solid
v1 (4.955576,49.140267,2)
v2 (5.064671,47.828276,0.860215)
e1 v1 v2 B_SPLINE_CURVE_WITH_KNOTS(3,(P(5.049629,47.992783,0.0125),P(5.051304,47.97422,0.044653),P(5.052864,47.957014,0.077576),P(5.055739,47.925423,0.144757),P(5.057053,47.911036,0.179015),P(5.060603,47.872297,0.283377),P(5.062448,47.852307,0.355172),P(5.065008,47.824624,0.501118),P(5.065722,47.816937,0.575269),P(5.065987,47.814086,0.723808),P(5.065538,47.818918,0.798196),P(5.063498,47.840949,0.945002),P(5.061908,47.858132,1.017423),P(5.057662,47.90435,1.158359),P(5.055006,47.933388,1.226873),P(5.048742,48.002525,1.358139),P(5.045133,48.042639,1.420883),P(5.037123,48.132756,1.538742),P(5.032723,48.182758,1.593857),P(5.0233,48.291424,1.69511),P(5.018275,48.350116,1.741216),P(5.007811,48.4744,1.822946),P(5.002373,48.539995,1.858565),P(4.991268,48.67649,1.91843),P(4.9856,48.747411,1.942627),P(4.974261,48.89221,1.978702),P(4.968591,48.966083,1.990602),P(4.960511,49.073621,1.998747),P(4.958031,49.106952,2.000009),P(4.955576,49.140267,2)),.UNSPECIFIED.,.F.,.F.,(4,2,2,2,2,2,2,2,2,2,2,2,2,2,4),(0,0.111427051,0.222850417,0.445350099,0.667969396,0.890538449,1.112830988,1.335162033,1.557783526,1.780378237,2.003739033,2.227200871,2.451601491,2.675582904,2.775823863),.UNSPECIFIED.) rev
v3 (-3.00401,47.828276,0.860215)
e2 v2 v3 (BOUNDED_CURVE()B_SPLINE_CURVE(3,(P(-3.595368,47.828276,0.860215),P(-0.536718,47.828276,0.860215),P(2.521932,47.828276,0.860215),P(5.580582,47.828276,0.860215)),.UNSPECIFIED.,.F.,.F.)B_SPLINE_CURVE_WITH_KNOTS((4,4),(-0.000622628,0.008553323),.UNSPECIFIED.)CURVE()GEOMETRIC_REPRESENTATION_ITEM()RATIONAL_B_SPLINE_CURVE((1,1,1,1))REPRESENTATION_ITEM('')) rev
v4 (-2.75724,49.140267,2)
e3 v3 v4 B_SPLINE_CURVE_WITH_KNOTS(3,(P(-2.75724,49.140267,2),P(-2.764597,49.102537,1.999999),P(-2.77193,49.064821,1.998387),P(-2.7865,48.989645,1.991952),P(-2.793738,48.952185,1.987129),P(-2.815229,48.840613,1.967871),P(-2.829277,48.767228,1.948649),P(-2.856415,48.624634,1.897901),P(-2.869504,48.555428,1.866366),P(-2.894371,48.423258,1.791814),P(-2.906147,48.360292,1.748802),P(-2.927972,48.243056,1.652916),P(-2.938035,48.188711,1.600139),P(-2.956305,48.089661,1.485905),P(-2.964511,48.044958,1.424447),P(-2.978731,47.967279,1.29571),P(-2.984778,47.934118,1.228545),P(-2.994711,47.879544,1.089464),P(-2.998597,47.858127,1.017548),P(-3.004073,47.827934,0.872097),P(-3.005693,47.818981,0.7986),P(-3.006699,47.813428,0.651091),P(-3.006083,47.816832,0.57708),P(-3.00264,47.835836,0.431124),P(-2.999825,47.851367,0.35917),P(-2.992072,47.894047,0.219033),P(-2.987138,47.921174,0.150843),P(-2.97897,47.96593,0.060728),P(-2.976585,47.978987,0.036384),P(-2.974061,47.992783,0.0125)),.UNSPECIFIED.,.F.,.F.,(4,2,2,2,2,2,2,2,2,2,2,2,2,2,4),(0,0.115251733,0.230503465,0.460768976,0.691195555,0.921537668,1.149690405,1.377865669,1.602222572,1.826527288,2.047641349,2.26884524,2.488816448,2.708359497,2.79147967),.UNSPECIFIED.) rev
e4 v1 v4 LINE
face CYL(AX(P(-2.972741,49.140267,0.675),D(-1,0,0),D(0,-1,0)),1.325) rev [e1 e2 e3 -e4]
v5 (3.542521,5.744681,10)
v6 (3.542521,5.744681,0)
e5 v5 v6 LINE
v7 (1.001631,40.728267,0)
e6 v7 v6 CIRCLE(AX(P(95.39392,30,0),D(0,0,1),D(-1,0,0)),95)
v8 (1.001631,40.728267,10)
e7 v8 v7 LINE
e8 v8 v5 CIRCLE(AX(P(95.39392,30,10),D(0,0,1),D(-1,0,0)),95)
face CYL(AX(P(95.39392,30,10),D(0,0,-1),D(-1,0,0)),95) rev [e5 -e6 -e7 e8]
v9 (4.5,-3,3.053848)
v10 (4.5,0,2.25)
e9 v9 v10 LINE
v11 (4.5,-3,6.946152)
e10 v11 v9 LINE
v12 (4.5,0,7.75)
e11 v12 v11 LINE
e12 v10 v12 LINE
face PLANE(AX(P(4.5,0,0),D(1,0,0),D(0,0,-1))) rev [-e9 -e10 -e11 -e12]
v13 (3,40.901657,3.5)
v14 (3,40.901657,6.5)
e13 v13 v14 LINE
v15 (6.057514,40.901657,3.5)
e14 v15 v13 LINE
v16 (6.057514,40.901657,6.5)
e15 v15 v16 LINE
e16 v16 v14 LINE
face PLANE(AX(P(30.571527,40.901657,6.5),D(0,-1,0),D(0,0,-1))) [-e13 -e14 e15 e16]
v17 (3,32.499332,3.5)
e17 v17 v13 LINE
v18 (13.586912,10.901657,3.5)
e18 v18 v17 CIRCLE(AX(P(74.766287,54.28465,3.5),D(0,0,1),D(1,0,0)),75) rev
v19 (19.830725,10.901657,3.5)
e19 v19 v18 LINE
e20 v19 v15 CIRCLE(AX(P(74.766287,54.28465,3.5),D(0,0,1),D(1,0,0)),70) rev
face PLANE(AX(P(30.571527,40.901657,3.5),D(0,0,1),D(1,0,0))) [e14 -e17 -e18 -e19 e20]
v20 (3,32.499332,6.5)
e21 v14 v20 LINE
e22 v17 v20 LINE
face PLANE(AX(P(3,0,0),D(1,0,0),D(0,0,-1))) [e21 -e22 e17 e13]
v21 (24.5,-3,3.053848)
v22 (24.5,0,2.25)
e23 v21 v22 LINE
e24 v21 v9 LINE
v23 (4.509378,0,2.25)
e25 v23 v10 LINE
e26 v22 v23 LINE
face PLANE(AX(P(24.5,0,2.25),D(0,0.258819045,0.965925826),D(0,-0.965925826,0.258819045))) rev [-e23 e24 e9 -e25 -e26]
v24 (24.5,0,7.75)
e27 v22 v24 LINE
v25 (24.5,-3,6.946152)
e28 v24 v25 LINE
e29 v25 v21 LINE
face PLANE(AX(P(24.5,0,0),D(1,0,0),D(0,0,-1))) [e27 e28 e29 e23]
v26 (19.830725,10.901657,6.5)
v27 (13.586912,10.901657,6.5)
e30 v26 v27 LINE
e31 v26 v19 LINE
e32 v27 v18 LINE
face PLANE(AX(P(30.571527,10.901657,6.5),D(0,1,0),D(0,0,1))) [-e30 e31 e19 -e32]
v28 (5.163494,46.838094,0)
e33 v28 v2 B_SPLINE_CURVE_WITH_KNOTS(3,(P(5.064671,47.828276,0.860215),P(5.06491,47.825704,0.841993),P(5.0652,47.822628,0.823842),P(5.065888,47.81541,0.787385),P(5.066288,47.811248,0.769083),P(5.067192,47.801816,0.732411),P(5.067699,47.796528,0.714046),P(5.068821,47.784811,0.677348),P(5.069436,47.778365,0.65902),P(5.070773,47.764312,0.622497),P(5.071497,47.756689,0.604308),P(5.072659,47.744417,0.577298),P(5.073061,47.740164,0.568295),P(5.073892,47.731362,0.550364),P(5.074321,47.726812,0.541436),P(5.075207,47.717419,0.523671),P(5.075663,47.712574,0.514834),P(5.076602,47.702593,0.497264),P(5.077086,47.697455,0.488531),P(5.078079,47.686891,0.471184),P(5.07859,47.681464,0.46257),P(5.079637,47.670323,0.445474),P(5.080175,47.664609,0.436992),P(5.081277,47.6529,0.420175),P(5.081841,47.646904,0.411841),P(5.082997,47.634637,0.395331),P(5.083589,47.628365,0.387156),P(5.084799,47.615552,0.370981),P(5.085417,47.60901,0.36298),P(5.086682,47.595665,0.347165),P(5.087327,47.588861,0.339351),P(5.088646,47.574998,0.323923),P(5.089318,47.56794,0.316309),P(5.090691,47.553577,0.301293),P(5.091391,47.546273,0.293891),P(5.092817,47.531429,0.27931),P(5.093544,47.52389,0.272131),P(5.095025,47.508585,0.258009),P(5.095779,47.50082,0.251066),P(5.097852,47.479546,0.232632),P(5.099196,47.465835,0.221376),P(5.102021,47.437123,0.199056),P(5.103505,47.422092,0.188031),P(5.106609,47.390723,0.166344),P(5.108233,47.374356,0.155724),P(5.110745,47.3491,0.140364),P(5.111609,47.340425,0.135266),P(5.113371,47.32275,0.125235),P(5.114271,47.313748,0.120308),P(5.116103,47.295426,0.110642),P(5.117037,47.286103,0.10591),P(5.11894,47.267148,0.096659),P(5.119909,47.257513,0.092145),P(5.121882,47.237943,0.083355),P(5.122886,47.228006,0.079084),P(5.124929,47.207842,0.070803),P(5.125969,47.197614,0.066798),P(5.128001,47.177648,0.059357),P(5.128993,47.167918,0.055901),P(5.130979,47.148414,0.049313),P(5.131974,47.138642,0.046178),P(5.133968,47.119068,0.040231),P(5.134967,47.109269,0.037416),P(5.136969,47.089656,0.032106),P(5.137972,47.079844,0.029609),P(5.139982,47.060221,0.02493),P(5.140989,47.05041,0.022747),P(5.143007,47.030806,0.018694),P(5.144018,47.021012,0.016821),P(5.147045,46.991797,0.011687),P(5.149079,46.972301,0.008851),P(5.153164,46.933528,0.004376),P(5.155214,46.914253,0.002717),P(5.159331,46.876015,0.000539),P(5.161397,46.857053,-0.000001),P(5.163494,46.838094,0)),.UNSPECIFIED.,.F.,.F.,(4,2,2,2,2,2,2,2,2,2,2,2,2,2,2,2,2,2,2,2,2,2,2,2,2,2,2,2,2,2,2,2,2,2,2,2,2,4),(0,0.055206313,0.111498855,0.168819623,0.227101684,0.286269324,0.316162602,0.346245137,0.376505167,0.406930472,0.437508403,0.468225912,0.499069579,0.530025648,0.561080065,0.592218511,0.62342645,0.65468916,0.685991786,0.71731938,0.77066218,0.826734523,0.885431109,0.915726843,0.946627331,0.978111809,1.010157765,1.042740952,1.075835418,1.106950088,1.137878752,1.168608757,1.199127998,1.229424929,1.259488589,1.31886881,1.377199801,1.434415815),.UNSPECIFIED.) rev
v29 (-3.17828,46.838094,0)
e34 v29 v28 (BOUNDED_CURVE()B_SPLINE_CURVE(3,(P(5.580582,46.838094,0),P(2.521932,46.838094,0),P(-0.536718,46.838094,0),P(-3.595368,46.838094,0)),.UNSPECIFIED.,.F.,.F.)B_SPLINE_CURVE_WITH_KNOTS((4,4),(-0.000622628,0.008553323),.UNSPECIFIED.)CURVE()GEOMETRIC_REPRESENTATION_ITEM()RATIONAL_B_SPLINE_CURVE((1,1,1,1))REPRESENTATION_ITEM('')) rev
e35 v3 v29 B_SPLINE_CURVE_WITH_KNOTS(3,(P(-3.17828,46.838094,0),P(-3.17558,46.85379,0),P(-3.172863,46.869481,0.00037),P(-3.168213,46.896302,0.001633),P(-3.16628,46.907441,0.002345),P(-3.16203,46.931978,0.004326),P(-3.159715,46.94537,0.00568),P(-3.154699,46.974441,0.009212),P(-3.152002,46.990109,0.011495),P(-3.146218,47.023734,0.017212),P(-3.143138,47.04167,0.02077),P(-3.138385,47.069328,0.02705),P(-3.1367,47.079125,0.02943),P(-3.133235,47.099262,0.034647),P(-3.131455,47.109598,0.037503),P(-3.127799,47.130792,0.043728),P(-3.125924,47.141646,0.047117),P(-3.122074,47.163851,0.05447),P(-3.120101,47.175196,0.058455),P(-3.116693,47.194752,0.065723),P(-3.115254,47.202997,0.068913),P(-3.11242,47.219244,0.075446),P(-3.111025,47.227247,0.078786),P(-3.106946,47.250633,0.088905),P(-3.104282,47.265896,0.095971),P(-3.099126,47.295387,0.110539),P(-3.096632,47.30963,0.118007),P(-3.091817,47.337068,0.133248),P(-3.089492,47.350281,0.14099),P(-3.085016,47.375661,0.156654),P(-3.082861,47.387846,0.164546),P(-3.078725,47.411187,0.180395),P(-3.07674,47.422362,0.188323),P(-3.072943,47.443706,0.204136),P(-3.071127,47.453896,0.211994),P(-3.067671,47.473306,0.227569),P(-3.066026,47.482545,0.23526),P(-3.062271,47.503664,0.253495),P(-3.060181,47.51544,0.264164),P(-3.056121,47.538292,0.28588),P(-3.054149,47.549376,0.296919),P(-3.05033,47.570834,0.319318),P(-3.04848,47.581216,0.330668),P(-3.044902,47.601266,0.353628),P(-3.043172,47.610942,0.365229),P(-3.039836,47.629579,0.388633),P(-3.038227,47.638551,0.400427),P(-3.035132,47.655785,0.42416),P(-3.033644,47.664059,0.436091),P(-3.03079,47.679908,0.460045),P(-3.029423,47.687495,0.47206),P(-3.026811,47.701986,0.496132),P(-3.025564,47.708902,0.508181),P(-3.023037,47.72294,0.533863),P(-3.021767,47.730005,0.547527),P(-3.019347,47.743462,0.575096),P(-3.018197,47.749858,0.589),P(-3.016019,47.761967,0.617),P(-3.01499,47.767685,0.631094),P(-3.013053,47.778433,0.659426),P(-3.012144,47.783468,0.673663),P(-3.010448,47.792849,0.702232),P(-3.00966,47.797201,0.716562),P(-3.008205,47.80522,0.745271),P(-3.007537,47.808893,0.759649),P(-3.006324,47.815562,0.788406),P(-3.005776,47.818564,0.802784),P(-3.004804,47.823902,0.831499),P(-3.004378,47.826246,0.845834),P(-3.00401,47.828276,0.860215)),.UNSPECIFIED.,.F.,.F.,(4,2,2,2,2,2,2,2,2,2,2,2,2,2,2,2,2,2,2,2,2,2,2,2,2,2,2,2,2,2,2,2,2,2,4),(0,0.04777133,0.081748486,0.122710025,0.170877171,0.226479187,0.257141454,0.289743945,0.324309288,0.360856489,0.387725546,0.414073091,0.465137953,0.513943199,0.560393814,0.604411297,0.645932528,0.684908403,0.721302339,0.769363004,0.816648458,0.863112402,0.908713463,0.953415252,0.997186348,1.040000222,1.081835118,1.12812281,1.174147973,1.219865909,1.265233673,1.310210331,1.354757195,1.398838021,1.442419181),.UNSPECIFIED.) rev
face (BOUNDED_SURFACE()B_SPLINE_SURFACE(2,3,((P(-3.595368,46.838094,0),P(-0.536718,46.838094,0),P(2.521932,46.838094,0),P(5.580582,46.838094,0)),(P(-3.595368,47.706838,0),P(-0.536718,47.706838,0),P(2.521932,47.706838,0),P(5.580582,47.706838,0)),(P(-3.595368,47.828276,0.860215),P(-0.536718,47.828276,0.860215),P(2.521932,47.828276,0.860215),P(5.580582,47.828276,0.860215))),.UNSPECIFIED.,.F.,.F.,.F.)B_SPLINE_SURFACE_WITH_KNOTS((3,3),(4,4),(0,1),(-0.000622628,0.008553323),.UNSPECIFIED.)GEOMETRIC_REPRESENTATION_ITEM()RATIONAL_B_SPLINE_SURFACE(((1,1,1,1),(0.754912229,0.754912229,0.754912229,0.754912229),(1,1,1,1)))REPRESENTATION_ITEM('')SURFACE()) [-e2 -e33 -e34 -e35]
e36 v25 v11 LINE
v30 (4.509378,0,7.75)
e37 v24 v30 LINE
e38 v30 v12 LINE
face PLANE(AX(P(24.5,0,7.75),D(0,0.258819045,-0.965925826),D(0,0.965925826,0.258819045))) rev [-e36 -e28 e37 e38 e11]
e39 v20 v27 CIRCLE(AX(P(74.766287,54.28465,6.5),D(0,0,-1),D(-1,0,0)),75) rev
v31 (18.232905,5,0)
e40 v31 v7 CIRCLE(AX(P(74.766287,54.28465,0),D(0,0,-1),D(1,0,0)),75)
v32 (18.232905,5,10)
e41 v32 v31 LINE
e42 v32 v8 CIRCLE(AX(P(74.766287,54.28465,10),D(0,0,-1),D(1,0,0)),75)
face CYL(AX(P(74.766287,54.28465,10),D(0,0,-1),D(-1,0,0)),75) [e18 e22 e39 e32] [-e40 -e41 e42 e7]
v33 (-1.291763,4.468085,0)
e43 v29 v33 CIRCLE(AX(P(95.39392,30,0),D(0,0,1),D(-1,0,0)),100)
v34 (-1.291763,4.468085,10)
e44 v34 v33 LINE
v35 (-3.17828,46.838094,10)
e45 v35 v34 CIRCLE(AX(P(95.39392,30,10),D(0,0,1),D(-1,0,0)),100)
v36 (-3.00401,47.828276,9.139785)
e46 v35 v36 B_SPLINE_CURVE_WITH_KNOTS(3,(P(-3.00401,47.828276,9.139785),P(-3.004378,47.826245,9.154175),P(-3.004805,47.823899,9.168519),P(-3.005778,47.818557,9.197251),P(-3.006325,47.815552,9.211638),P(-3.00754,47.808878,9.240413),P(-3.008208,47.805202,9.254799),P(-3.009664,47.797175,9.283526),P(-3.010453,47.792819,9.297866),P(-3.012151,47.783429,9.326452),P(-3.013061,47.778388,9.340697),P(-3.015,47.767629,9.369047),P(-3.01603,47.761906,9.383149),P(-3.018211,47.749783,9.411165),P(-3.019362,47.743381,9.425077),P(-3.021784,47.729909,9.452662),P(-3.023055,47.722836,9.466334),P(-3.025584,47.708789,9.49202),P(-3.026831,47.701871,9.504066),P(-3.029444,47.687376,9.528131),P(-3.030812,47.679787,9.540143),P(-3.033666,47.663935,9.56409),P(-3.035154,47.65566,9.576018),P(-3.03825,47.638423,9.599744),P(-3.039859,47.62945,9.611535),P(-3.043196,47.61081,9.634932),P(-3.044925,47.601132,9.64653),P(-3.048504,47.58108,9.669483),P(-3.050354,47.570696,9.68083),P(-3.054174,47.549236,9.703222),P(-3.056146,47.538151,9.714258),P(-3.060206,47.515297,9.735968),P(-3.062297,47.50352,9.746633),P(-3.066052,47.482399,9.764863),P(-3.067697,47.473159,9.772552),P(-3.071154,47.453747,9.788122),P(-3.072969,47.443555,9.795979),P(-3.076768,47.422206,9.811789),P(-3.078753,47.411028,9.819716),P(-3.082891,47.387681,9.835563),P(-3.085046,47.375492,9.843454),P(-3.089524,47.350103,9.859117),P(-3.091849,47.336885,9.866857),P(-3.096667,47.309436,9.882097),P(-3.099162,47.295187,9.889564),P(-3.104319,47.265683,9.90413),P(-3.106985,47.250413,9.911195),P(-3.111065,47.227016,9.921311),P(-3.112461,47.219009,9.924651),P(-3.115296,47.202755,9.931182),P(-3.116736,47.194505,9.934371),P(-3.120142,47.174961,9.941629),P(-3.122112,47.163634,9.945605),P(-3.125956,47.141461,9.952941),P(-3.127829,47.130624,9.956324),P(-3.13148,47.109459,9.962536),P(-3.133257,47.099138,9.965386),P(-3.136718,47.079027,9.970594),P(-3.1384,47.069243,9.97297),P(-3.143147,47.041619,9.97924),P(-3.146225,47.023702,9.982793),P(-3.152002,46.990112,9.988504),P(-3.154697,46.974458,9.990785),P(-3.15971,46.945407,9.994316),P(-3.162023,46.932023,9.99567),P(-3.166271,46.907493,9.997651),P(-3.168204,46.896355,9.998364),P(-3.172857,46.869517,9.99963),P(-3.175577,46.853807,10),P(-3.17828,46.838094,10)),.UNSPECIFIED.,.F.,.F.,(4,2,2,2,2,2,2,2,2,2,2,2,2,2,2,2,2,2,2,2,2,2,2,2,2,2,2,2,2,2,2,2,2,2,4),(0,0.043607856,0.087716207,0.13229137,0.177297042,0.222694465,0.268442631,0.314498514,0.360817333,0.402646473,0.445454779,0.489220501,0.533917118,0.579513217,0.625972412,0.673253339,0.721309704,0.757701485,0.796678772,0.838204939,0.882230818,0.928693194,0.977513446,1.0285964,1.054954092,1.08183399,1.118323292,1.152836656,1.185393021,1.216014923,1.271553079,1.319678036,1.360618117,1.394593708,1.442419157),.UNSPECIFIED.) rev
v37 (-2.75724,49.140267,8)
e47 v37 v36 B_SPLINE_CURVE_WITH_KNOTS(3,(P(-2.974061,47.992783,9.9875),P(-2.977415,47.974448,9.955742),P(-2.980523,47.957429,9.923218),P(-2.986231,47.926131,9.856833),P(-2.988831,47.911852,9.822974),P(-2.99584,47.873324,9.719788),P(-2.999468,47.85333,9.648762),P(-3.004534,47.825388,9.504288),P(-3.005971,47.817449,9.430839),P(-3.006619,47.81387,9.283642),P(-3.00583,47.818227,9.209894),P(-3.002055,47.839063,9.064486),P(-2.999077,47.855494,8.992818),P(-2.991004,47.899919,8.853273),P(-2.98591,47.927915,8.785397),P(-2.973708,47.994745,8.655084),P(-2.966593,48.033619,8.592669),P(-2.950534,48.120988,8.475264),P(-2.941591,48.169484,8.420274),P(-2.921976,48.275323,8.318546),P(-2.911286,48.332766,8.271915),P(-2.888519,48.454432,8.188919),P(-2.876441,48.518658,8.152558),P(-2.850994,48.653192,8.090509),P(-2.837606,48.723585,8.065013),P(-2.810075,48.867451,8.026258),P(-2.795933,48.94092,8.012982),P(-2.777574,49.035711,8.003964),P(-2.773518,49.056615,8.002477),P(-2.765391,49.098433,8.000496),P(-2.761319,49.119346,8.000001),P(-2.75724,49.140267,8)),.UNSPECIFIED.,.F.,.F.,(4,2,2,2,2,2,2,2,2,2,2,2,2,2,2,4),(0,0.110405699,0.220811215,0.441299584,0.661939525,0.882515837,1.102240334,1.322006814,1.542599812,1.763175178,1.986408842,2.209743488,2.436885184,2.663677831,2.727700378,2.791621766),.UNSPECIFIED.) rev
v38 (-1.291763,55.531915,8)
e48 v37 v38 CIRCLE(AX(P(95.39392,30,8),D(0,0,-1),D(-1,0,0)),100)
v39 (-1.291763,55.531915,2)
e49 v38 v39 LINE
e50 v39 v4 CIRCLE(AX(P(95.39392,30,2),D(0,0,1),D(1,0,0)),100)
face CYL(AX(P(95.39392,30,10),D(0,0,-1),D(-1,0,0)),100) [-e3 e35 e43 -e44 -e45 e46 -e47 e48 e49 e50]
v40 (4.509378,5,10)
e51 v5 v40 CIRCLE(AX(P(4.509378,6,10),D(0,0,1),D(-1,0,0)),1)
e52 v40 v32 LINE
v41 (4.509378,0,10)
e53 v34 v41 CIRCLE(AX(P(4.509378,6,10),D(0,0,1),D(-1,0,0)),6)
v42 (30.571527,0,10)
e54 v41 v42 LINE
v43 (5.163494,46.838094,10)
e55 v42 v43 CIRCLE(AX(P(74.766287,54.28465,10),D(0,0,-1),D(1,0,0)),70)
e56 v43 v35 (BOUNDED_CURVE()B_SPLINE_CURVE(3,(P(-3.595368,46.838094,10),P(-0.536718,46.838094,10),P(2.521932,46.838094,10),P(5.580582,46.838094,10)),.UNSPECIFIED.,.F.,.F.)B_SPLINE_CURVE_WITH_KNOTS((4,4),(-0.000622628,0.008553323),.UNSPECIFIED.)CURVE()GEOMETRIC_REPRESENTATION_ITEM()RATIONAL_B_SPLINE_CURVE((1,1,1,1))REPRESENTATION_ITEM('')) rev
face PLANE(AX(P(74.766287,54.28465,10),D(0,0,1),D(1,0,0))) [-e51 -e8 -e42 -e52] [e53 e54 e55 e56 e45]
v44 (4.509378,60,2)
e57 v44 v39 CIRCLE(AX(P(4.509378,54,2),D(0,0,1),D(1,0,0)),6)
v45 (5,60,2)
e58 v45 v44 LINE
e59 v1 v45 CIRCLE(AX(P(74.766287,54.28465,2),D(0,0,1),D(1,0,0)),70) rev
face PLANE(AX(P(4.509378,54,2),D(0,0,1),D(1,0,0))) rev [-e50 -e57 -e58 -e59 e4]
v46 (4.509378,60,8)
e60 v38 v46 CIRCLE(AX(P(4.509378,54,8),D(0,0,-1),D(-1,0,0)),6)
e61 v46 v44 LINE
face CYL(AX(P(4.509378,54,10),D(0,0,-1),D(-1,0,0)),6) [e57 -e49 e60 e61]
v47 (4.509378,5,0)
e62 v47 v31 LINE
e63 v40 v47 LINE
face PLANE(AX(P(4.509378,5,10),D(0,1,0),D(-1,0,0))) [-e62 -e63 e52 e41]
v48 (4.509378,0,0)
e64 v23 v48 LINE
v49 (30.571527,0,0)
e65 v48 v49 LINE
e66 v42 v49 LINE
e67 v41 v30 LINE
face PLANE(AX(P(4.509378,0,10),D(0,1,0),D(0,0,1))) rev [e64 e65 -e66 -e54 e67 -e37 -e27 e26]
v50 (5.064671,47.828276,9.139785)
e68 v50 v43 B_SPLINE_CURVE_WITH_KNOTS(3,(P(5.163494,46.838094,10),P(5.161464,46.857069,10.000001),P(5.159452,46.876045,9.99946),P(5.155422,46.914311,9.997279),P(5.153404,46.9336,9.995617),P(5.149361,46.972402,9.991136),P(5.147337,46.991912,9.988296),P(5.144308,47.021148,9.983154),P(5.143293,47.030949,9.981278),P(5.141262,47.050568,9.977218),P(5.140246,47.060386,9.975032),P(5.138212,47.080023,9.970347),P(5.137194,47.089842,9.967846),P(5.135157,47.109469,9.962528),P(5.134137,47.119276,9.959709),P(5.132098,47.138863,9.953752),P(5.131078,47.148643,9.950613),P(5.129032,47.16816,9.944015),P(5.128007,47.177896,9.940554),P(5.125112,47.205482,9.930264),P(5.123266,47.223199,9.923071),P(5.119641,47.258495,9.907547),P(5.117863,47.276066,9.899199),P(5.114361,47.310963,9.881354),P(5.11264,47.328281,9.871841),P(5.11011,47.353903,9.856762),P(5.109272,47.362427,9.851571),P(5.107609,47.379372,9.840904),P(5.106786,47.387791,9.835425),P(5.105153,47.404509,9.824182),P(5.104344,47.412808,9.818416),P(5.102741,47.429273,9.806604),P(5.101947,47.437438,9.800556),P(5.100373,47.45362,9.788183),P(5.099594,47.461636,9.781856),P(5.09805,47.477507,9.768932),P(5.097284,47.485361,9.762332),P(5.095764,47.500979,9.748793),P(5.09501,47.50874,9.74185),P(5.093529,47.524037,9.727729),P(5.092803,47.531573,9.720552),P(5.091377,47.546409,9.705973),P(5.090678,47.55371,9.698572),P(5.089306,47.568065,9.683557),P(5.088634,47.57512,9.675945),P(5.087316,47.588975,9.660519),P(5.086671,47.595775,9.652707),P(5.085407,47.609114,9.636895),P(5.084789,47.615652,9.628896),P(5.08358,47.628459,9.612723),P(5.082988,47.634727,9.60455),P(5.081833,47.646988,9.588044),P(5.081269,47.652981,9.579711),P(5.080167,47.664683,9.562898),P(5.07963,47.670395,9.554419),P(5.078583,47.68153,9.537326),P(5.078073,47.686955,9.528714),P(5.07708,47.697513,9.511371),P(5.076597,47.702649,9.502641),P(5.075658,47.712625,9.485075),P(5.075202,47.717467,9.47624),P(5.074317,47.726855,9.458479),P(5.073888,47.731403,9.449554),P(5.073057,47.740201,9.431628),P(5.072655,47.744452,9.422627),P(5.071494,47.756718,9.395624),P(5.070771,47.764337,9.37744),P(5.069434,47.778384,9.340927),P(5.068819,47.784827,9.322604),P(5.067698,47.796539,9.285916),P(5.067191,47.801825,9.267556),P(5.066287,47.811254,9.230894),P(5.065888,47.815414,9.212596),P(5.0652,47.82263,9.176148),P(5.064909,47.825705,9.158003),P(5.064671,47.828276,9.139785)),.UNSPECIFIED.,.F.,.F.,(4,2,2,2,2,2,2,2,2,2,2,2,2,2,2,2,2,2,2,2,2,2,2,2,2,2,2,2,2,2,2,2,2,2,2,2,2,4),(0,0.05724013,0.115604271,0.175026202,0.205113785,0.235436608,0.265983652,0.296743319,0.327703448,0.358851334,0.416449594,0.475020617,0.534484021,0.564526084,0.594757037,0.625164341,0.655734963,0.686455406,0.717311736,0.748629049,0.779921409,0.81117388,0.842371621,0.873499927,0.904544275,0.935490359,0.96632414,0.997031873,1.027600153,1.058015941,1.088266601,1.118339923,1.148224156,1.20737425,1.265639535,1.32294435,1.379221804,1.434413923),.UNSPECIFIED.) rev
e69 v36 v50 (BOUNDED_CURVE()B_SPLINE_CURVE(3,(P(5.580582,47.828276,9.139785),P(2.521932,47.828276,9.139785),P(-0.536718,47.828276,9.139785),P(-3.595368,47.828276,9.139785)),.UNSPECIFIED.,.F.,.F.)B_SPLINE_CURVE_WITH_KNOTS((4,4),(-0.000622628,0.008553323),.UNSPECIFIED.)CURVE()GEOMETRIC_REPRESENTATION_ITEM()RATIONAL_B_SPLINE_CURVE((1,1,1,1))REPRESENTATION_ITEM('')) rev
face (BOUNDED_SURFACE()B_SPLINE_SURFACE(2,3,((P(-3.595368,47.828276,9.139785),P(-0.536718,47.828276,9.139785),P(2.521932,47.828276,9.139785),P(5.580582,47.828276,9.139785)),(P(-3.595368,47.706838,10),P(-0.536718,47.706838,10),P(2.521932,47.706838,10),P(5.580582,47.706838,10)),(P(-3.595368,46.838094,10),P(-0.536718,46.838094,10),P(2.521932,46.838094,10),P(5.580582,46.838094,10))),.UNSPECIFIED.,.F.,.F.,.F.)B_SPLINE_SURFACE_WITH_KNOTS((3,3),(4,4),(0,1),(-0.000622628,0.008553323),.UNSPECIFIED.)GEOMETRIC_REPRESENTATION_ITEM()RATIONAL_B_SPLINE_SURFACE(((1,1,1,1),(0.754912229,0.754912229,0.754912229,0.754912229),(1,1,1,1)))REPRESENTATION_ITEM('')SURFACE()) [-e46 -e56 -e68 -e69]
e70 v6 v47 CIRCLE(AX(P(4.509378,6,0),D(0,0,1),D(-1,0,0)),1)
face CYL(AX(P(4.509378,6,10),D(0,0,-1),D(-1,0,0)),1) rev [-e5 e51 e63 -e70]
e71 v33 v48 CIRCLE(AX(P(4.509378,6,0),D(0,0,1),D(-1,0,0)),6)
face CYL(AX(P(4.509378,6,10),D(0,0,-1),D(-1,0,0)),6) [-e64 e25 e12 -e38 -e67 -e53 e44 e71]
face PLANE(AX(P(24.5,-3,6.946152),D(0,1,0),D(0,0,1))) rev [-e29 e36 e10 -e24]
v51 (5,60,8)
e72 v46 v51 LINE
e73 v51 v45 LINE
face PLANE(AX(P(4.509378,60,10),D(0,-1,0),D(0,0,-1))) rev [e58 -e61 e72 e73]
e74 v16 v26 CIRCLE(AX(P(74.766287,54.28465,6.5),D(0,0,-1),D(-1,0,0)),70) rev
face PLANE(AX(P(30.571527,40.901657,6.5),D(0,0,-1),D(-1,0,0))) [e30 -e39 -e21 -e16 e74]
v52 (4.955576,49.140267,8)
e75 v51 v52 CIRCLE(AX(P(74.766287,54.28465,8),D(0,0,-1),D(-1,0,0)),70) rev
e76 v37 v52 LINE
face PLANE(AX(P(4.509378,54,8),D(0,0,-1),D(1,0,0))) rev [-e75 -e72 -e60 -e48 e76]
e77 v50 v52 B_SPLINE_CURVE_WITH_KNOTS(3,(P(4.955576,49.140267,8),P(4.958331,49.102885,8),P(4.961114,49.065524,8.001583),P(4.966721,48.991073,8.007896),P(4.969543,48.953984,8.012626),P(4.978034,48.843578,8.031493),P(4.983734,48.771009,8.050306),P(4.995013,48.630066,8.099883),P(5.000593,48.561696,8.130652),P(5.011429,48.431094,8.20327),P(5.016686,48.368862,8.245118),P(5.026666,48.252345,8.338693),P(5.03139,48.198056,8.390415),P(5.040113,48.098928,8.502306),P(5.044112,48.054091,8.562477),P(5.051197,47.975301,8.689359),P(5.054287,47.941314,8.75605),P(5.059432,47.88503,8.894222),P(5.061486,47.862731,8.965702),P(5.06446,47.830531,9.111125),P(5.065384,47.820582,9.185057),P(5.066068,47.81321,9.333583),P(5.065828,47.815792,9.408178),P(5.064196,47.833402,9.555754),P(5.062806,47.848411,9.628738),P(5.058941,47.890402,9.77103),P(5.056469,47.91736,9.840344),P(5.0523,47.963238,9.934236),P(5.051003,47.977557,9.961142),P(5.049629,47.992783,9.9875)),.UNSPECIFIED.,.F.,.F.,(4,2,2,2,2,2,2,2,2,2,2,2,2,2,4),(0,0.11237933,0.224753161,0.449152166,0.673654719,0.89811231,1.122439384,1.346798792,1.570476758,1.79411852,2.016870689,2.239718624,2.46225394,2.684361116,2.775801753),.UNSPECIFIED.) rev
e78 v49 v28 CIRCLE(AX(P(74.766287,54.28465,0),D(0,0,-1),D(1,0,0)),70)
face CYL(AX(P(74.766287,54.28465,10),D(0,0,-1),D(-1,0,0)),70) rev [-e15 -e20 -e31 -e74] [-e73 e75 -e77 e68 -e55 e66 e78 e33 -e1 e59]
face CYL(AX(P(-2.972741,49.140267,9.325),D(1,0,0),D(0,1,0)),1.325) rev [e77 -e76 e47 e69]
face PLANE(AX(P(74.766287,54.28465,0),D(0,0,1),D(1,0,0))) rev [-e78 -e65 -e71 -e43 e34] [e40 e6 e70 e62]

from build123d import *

# Parameters (mm, degrees)
BOSS_EXTRU_1_DEPTH      = 10
ENL_V_START             = 3
ESQUISSE3_W             = 3
ESQUISSE3_H             = 30
ENL_V_MAT_EXTRU_2_DEPTH = 66.07803068
BOSS_EXTRU_2_START      = 4.5
BOSS_EXTRU_2_DEPTH      = 20
ENL_V_MAT_EXTRU_3_DEPTH = 2
ENL_V_MAT_EXTRU_3_TAPER = -30
CONG_1_R                = 1.325
CONG_2_R                = 1.325
CONG_VARIABLE1_R        = 1


with BuildPart() as part:
    # Esquisse1 → Boss.-Extru.1 (new body)
    with BuildSketch(Plane.XY):
        with BuildLine():
            Line((4.509378002, 0), (30.57152697, 0))
            ThreePointArc((30.57152697, 0), (10.370789772, 26.839796662), (5, 60))
            Line((5, 60), (4.509378002, 60))
            ThreePointArc((4.509378002, 60), (0.848195772, 58.753498152), (-1.291762986, 55.531914894))
            ThreePointArc((-1.291762986, 55.531914894), (-4.606079858, 30), (-1.291762986, 4.468085106))
            ThreePointArc((-1.291762986, 4.468085106), (0.848195772, 1.246501848), (4.509378002, 0))
        make_face()
        with BuildLine():
            Line((4.509378002, 5), (18.232904672, 5))
            ThreePointArc((18.232904672, 5), (7.212441996, 21.704317491), (1.001630768, 40.728266722))
            ThreePointArc((1.001630768, 40.728266722), (0.643507572, 23.118189348), (3.54252117, 5.744680851))
            ThreePointArc((3.54252117, 5.744680851), (3.899180963, 5.207750308), (4.509378002, 5))
        make_face(mode=Mode.SUBTRACT)
    extrude(amount=BOSS_EXTRU_1_DEPTH)

    # Esquisse3 → Enlèv. mat.-Extru.2 (cut, through all)
    with BuildSketch(Plane(origin=(0, 0, 0), x_dir=(0, 0, -1), z_dir=(1, 0, 0)).offset(ENL_V_START)):
        with Locations((-5, 25.901656599)):
            Rectangle(ESQUISSE3_W, ESQUISSE3_H)
    extrude(amount=ENL_V_MAT_EXTRU_2_DEPTH, mode=Mode.SUBTRACT)


with BuildPart() as boss_extru_2_tool:
    # Esquisse4 → Boss.-Extru.2 (new body)
    with BuildSketch(Plane(origin=(0, 0, 0), x_dir=(0, 0, -1), z_dir=(1, 0, 0)).offset(BOSS_EXTRU_2_START)):
        Polygon((-7.75, 0), (-2.25, 0), (-3.053847577, -3), (-6.946152423, -3), align=None)
    extrude(amount=BOSS_EXTRU_2_DEPTH)


with BuildPart() as part_1:
    add(part.part)


with BuildPart() as part_2:
    # Boss.-Extru.2: joined with boss_extru_2_tool
    add(part_1.part.fuse(boss_extru_2_tool.part, tol=0.00001))

    # Esquisse6 → Enlèv. mat.-Extru.3 (cut)
    with BuildSketch(Plane.XY):
        with BuildLine():
            Line((-2.972740877, 48), (5.048977769, 48))
            ThreePointArc((5.048977769, 48), (4.766869828, 53.998948533), (5, 60))
            Line((5, 60), (4.509378002, 60))
            ThreePointArc((4.509378002, 60), (0.848195772, 58.753498152), (-1.291762986, 55.531914894))
            ThreePointArc((-1.291762986, 55.531914894), (-2.204935767, 51.782179075), (-2.972740877, 48))
        make_face()
    enl_v_mat_extru_3 = extrude(amount=ENL_V_MAT_EXTRU_3_DEPTH, taper=ENL_V_MAT_EXTRU_3_TAPER, mode=Mode.SUBTRACT)

    # Symétrie1: Enlèv. mat.-Extru.3 across plane
    add(enl_v_mat_extru_3.mirror(Plane(origin=(0, 0, 5), x_dir=(1, 0, 0), z_dir=(0, 0, -1))), mode=Mode.SUBTRACT)

    # Congé1
    cong_1_edges = [part_2.edges().sort_by_distance(p)[0] for p in [
        (0.992837273, 46.845299462, 8),
    ]]
    fillet(cong_1_edges, radius=CONG_1_R)

    # Congé2
    cong_2_edges = [part_2.edges().sort_by_distance(p)[0] for p in [
        (0.992837273, 46.845299462, 2),
    ]]
    fillet(cong_2_edges, radius=CONG_2_R)

    # Congé variable1
    cong_variable1_edges = [part_2.edges().sort_by_distance(p)[0] for p in [
        (1.038118446, 48, 0),
        (1.038118446, 48, 10),
    ]]
    fillet(cong_variable1_edges, radius=CONG_VARIABLE1_R)


solid = part_2.part
